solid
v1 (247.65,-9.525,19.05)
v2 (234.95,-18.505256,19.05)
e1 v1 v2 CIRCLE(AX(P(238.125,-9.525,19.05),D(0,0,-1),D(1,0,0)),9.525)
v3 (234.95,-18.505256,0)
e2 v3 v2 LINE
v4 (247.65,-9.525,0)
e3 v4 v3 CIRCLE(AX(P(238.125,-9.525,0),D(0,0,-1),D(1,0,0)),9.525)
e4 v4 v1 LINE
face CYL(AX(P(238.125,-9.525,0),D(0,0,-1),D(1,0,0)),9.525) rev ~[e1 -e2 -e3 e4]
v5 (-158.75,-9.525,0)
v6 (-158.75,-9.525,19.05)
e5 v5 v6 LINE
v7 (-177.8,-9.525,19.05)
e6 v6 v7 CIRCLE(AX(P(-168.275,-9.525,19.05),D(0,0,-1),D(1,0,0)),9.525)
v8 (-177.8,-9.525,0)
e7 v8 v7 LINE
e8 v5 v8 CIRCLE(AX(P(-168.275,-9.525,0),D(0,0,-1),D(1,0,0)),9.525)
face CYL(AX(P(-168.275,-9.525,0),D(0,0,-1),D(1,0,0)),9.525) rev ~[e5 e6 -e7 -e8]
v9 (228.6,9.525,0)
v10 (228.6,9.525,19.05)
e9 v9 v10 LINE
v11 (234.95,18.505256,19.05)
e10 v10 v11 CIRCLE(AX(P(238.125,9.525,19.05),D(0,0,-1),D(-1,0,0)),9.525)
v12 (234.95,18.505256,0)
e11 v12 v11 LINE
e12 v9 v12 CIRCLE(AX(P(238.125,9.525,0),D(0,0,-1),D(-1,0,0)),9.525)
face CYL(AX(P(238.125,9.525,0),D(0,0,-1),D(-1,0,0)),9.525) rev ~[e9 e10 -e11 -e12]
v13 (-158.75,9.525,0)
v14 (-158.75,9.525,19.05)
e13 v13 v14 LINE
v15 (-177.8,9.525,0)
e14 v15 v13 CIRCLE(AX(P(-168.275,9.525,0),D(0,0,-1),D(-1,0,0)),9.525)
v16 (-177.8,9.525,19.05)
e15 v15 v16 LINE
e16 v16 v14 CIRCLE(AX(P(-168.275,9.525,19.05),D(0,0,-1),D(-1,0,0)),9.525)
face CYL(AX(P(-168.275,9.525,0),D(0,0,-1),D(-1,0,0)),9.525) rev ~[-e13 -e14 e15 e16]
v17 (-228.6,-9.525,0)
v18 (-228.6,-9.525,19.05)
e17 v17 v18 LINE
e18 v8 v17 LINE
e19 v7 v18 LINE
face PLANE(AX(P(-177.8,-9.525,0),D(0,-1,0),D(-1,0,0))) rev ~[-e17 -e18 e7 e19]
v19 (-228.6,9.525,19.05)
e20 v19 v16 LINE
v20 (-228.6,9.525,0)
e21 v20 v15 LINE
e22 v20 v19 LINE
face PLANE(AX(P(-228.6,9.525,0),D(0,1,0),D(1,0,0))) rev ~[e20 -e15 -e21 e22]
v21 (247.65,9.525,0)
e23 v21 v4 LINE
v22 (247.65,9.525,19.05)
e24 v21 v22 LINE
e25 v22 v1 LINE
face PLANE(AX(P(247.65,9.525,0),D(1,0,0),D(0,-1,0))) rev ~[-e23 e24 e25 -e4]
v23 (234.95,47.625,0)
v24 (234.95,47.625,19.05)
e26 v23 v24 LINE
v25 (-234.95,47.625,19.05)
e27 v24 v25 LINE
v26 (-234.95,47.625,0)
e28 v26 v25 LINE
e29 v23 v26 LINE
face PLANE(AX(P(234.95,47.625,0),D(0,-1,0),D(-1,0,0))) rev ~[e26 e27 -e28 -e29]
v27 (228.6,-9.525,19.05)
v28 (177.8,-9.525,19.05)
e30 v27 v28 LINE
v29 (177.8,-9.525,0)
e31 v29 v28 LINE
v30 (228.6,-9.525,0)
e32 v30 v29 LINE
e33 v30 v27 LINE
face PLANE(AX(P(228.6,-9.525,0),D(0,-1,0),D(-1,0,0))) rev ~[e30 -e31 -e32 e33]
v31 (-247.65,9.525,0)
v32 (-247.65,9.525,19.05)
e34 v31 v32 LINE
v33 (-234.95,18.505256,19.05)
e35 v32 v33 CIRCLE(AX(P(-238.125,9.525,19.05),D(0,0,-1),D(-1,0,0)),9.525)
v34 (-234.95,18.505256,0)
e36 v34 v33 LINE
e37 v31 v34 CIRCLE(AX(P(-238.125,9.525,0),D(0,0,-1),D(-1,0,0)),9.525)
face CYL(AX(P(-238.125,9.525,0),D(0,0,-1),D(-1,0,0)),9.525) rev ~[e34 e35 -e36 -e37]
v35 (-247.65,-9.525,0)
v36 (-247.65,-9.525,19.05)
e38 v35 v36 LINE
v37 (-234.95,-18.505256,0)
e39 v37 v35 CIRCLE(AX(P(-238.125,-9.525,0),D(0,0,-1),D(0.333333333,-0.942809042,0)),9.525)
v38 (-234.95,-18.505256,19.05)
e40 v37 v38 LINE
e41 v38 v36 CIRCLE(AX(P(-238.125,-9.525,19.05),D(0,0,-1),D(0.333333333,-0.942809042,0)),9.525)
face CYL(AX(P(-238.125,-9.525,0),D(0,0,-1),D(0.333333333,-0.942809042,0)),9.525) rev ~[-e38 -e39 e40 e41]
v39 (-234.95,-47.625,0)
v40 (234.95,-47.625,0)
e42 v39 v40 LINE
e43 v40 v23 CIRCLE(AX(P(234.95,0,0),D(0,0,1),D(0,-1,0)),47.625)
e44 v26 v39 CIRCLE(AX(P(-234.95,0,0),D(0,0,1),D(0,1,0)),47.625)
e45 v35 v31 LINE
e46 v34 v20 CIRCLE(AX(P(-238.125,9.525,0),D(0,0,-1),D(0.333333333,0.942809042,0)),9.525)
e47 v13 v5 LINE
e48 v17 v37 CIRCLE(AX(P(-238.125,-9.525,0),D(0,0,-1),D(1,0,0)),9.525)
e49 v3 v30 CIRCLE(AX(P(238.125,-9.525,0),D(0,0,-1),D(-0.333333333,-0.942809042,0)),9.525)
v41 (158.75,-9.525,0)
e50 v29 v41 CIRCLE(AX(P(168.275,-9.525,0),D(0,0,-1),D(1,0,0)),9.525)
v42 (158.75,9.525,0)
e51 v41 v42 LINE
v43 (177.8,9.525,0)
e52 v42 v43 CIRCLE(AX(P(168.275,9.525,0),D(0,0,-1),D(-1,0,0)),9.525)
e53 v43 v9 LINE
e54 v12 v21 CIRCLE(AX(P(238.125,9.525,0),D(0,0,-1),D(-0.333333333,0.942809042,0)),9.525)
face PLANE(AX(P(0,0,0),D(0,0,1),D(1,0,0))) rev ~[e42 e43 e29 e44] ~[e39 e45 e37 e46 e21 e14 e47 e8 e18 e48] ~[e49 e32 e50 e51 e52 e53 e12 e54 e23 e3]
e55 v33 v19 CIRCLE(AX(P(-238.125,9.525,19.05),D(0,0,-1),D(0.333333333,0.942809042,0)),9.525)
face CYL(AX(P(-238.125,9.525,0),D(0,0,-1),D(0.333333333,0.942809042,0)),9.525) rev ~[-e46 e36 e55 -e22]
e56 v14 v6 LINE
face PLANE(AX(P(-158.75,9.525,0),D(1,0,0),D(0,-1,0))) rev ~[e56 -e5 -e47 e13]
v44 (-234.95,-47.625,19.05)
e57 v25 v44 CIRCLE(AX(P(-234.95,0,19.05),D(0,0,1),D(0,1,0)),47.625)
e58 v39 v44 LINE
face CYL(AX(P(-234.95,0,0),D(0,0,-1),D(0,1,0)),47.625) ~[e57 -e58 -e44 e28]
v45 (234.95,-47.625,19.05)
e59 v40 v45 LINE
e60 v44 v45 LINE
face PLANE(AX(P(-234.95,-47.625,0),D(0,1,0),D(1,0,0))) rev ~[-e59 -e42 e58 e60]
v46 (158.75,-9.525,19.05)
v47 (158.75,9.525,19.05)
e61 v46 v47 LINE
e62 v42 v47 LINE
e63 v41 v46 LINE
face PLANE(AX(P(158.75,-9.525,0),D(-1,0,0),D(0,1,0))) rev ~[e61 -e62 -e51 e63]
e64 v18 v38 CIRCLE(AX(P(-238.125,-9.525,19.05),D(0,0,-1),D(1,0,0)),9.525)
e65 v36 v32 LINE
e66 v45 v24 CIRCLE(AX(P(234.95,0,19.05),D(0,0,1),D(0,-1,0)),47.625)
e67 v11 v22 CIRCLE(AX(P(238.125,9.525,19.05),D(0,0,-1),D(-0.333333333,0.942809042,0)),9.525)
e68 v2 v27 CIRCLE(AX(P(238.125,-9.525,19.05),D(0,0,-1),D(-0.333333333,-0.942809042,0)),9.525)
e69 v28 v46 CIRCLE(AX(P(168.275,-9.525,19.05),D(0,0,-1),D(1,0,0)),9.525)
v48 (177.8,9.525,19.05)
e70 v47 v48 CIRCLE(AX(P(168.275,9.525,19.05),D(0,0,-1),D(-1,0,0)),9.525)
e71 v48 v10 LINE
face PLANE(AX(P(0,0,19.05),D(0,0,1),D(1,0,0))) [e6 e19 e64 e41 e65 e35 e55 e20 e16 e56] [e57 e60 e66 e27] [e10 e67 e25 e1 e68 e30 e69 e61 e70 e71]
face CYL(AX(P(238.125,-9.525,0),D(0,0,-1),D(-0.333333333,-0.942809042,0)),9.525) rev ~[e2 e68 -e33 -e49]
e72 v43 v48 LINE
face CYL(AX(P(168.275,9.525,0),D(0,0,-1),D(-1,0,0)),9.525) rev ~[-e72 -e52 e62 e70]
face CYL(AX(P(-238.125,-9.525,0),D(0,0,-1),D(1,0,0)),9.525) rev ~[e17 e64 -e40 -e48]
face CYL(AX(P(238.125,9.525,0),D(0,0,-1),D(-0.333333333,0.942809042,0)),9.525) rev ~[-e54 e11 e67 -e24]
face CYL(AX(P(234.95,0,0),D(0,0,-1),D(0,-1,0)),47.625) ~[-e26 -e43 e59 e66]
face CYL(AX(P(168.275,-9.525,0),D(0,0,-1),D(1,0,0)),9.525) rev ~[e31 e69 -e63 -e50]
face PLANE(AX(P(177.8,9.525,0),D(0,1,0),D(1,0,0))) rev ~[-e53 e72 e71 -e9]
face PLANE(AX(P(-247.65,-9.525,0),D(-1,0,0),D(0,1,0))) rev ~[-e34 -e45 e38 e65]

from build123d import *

# Parameters (mm, degrees)
F2_DEPTH = 19.05


# Not quite as in the source:
# - a variable given as a bare number and used for a length is read in inches; the dataset says mm whatever the document's units were


with BuildPart() as f2:
    # F1 (on Top) → F2 (new body)
    with BuildSketch(Plane.XY):
        with BuildLine():
            Line((234.95, 47.625), (-234.95, 47.625))
            Line((-234.95, 47.625), (-234.95, 18.5052561211))
            ThreePointArc((-234.95, 18.5052561211), (-230.3478700667, 15.024261314), (-228.6, 9.525))
            Line((-228.6, 9.525), (-177.8, 9.525))
            ThreePointArc((-177.8, 9.525), (-168.275, 19.05), (-158.75, 9.525))
            Line((-158.75, 9.525), (-158.75, -9.525))
            ThreePointArc((-158.75, -9.525), (-168.275, -19.05), (-177.8, -9.525))
            Line((-177.8, -9.525), (-228.6, -9.525))
            ThreePointArc((-228.6, -9.525), (-230.3478700667, -15.024261314), (-234.95, -18.5052561211))
            Line((-234.95, -18.5052561211), (-234.95, -47.625))
            Line((-234.95, -47.625), (234.95, -47.625))
            Line((234.95, -47.625), (234.95, -18.5052561211))
            ThreePointArc((234.95, -18.5052561211), (230.3478700667, -15.024261314), (228.6, -9.525))
            Line((228.6, -9.525), (177.8, -9.525))
            ThreePointArc((177.8, -9.525), (168.275, -19.05), (158.75, -9.525))
            Line((158.75, -9.525), (158.75, 9.525))
            ThreePointArc((158.75, 9.525), (168.275, 19.05), (177.8, 9.525))
            Line((177.8, 9.525), (228.6, 9.525))
            ThreePointArc((228.6, 9.525), (230.3478700667, 15.024261314), (234.95, 18.5052561211))
            Line((234.95, 18.5052561211), (234.95, 47.625))
        make_face()
        with BuildLine():
            Line((-234.95, 18.5052561211), (-234.95, 47.625))
            ThreePointArc((-234.95, 47.625), (-282.575, 0), (-234.95, -47.625))
            Line((-234.95, -47.625), (-234.95, -18.5052561211))
            ThreePointArc((-234.95, -18.5052561211), (-243.624261314, -17.3021299333), (-247.65, -9.525))
            Line((-247.65, -9.525), (-247.65, 9.525))
            ThreePointArc((-247.65, 9.525), (-243.624261314, 17.3021299333), (-234.95, 18.5052561211))
        make_face()
        with BuildLine():
            ThreePointArc((234.95, -47.625), (282.575, 0), (234.95, 47.625))
            Line((234.95, 47.625), (234.95, 18.5052561211))
            ThreePointArc((234.95, 18.5052561211), (243.624261314, 17.3021299333), (247.65, 9.525))
            Line((247.65, 9.525), (247.65, -9.525))
            ThreePointArc((247.65, -9.525), (243.624261314, -17.3021299333), (234.95, -18.5052561211))
            Line((234.95, -18.5052561211), (234.95, -47.625))
        make_face()
    extrude(amount=F2_DEPTH)


solid = f2.part
